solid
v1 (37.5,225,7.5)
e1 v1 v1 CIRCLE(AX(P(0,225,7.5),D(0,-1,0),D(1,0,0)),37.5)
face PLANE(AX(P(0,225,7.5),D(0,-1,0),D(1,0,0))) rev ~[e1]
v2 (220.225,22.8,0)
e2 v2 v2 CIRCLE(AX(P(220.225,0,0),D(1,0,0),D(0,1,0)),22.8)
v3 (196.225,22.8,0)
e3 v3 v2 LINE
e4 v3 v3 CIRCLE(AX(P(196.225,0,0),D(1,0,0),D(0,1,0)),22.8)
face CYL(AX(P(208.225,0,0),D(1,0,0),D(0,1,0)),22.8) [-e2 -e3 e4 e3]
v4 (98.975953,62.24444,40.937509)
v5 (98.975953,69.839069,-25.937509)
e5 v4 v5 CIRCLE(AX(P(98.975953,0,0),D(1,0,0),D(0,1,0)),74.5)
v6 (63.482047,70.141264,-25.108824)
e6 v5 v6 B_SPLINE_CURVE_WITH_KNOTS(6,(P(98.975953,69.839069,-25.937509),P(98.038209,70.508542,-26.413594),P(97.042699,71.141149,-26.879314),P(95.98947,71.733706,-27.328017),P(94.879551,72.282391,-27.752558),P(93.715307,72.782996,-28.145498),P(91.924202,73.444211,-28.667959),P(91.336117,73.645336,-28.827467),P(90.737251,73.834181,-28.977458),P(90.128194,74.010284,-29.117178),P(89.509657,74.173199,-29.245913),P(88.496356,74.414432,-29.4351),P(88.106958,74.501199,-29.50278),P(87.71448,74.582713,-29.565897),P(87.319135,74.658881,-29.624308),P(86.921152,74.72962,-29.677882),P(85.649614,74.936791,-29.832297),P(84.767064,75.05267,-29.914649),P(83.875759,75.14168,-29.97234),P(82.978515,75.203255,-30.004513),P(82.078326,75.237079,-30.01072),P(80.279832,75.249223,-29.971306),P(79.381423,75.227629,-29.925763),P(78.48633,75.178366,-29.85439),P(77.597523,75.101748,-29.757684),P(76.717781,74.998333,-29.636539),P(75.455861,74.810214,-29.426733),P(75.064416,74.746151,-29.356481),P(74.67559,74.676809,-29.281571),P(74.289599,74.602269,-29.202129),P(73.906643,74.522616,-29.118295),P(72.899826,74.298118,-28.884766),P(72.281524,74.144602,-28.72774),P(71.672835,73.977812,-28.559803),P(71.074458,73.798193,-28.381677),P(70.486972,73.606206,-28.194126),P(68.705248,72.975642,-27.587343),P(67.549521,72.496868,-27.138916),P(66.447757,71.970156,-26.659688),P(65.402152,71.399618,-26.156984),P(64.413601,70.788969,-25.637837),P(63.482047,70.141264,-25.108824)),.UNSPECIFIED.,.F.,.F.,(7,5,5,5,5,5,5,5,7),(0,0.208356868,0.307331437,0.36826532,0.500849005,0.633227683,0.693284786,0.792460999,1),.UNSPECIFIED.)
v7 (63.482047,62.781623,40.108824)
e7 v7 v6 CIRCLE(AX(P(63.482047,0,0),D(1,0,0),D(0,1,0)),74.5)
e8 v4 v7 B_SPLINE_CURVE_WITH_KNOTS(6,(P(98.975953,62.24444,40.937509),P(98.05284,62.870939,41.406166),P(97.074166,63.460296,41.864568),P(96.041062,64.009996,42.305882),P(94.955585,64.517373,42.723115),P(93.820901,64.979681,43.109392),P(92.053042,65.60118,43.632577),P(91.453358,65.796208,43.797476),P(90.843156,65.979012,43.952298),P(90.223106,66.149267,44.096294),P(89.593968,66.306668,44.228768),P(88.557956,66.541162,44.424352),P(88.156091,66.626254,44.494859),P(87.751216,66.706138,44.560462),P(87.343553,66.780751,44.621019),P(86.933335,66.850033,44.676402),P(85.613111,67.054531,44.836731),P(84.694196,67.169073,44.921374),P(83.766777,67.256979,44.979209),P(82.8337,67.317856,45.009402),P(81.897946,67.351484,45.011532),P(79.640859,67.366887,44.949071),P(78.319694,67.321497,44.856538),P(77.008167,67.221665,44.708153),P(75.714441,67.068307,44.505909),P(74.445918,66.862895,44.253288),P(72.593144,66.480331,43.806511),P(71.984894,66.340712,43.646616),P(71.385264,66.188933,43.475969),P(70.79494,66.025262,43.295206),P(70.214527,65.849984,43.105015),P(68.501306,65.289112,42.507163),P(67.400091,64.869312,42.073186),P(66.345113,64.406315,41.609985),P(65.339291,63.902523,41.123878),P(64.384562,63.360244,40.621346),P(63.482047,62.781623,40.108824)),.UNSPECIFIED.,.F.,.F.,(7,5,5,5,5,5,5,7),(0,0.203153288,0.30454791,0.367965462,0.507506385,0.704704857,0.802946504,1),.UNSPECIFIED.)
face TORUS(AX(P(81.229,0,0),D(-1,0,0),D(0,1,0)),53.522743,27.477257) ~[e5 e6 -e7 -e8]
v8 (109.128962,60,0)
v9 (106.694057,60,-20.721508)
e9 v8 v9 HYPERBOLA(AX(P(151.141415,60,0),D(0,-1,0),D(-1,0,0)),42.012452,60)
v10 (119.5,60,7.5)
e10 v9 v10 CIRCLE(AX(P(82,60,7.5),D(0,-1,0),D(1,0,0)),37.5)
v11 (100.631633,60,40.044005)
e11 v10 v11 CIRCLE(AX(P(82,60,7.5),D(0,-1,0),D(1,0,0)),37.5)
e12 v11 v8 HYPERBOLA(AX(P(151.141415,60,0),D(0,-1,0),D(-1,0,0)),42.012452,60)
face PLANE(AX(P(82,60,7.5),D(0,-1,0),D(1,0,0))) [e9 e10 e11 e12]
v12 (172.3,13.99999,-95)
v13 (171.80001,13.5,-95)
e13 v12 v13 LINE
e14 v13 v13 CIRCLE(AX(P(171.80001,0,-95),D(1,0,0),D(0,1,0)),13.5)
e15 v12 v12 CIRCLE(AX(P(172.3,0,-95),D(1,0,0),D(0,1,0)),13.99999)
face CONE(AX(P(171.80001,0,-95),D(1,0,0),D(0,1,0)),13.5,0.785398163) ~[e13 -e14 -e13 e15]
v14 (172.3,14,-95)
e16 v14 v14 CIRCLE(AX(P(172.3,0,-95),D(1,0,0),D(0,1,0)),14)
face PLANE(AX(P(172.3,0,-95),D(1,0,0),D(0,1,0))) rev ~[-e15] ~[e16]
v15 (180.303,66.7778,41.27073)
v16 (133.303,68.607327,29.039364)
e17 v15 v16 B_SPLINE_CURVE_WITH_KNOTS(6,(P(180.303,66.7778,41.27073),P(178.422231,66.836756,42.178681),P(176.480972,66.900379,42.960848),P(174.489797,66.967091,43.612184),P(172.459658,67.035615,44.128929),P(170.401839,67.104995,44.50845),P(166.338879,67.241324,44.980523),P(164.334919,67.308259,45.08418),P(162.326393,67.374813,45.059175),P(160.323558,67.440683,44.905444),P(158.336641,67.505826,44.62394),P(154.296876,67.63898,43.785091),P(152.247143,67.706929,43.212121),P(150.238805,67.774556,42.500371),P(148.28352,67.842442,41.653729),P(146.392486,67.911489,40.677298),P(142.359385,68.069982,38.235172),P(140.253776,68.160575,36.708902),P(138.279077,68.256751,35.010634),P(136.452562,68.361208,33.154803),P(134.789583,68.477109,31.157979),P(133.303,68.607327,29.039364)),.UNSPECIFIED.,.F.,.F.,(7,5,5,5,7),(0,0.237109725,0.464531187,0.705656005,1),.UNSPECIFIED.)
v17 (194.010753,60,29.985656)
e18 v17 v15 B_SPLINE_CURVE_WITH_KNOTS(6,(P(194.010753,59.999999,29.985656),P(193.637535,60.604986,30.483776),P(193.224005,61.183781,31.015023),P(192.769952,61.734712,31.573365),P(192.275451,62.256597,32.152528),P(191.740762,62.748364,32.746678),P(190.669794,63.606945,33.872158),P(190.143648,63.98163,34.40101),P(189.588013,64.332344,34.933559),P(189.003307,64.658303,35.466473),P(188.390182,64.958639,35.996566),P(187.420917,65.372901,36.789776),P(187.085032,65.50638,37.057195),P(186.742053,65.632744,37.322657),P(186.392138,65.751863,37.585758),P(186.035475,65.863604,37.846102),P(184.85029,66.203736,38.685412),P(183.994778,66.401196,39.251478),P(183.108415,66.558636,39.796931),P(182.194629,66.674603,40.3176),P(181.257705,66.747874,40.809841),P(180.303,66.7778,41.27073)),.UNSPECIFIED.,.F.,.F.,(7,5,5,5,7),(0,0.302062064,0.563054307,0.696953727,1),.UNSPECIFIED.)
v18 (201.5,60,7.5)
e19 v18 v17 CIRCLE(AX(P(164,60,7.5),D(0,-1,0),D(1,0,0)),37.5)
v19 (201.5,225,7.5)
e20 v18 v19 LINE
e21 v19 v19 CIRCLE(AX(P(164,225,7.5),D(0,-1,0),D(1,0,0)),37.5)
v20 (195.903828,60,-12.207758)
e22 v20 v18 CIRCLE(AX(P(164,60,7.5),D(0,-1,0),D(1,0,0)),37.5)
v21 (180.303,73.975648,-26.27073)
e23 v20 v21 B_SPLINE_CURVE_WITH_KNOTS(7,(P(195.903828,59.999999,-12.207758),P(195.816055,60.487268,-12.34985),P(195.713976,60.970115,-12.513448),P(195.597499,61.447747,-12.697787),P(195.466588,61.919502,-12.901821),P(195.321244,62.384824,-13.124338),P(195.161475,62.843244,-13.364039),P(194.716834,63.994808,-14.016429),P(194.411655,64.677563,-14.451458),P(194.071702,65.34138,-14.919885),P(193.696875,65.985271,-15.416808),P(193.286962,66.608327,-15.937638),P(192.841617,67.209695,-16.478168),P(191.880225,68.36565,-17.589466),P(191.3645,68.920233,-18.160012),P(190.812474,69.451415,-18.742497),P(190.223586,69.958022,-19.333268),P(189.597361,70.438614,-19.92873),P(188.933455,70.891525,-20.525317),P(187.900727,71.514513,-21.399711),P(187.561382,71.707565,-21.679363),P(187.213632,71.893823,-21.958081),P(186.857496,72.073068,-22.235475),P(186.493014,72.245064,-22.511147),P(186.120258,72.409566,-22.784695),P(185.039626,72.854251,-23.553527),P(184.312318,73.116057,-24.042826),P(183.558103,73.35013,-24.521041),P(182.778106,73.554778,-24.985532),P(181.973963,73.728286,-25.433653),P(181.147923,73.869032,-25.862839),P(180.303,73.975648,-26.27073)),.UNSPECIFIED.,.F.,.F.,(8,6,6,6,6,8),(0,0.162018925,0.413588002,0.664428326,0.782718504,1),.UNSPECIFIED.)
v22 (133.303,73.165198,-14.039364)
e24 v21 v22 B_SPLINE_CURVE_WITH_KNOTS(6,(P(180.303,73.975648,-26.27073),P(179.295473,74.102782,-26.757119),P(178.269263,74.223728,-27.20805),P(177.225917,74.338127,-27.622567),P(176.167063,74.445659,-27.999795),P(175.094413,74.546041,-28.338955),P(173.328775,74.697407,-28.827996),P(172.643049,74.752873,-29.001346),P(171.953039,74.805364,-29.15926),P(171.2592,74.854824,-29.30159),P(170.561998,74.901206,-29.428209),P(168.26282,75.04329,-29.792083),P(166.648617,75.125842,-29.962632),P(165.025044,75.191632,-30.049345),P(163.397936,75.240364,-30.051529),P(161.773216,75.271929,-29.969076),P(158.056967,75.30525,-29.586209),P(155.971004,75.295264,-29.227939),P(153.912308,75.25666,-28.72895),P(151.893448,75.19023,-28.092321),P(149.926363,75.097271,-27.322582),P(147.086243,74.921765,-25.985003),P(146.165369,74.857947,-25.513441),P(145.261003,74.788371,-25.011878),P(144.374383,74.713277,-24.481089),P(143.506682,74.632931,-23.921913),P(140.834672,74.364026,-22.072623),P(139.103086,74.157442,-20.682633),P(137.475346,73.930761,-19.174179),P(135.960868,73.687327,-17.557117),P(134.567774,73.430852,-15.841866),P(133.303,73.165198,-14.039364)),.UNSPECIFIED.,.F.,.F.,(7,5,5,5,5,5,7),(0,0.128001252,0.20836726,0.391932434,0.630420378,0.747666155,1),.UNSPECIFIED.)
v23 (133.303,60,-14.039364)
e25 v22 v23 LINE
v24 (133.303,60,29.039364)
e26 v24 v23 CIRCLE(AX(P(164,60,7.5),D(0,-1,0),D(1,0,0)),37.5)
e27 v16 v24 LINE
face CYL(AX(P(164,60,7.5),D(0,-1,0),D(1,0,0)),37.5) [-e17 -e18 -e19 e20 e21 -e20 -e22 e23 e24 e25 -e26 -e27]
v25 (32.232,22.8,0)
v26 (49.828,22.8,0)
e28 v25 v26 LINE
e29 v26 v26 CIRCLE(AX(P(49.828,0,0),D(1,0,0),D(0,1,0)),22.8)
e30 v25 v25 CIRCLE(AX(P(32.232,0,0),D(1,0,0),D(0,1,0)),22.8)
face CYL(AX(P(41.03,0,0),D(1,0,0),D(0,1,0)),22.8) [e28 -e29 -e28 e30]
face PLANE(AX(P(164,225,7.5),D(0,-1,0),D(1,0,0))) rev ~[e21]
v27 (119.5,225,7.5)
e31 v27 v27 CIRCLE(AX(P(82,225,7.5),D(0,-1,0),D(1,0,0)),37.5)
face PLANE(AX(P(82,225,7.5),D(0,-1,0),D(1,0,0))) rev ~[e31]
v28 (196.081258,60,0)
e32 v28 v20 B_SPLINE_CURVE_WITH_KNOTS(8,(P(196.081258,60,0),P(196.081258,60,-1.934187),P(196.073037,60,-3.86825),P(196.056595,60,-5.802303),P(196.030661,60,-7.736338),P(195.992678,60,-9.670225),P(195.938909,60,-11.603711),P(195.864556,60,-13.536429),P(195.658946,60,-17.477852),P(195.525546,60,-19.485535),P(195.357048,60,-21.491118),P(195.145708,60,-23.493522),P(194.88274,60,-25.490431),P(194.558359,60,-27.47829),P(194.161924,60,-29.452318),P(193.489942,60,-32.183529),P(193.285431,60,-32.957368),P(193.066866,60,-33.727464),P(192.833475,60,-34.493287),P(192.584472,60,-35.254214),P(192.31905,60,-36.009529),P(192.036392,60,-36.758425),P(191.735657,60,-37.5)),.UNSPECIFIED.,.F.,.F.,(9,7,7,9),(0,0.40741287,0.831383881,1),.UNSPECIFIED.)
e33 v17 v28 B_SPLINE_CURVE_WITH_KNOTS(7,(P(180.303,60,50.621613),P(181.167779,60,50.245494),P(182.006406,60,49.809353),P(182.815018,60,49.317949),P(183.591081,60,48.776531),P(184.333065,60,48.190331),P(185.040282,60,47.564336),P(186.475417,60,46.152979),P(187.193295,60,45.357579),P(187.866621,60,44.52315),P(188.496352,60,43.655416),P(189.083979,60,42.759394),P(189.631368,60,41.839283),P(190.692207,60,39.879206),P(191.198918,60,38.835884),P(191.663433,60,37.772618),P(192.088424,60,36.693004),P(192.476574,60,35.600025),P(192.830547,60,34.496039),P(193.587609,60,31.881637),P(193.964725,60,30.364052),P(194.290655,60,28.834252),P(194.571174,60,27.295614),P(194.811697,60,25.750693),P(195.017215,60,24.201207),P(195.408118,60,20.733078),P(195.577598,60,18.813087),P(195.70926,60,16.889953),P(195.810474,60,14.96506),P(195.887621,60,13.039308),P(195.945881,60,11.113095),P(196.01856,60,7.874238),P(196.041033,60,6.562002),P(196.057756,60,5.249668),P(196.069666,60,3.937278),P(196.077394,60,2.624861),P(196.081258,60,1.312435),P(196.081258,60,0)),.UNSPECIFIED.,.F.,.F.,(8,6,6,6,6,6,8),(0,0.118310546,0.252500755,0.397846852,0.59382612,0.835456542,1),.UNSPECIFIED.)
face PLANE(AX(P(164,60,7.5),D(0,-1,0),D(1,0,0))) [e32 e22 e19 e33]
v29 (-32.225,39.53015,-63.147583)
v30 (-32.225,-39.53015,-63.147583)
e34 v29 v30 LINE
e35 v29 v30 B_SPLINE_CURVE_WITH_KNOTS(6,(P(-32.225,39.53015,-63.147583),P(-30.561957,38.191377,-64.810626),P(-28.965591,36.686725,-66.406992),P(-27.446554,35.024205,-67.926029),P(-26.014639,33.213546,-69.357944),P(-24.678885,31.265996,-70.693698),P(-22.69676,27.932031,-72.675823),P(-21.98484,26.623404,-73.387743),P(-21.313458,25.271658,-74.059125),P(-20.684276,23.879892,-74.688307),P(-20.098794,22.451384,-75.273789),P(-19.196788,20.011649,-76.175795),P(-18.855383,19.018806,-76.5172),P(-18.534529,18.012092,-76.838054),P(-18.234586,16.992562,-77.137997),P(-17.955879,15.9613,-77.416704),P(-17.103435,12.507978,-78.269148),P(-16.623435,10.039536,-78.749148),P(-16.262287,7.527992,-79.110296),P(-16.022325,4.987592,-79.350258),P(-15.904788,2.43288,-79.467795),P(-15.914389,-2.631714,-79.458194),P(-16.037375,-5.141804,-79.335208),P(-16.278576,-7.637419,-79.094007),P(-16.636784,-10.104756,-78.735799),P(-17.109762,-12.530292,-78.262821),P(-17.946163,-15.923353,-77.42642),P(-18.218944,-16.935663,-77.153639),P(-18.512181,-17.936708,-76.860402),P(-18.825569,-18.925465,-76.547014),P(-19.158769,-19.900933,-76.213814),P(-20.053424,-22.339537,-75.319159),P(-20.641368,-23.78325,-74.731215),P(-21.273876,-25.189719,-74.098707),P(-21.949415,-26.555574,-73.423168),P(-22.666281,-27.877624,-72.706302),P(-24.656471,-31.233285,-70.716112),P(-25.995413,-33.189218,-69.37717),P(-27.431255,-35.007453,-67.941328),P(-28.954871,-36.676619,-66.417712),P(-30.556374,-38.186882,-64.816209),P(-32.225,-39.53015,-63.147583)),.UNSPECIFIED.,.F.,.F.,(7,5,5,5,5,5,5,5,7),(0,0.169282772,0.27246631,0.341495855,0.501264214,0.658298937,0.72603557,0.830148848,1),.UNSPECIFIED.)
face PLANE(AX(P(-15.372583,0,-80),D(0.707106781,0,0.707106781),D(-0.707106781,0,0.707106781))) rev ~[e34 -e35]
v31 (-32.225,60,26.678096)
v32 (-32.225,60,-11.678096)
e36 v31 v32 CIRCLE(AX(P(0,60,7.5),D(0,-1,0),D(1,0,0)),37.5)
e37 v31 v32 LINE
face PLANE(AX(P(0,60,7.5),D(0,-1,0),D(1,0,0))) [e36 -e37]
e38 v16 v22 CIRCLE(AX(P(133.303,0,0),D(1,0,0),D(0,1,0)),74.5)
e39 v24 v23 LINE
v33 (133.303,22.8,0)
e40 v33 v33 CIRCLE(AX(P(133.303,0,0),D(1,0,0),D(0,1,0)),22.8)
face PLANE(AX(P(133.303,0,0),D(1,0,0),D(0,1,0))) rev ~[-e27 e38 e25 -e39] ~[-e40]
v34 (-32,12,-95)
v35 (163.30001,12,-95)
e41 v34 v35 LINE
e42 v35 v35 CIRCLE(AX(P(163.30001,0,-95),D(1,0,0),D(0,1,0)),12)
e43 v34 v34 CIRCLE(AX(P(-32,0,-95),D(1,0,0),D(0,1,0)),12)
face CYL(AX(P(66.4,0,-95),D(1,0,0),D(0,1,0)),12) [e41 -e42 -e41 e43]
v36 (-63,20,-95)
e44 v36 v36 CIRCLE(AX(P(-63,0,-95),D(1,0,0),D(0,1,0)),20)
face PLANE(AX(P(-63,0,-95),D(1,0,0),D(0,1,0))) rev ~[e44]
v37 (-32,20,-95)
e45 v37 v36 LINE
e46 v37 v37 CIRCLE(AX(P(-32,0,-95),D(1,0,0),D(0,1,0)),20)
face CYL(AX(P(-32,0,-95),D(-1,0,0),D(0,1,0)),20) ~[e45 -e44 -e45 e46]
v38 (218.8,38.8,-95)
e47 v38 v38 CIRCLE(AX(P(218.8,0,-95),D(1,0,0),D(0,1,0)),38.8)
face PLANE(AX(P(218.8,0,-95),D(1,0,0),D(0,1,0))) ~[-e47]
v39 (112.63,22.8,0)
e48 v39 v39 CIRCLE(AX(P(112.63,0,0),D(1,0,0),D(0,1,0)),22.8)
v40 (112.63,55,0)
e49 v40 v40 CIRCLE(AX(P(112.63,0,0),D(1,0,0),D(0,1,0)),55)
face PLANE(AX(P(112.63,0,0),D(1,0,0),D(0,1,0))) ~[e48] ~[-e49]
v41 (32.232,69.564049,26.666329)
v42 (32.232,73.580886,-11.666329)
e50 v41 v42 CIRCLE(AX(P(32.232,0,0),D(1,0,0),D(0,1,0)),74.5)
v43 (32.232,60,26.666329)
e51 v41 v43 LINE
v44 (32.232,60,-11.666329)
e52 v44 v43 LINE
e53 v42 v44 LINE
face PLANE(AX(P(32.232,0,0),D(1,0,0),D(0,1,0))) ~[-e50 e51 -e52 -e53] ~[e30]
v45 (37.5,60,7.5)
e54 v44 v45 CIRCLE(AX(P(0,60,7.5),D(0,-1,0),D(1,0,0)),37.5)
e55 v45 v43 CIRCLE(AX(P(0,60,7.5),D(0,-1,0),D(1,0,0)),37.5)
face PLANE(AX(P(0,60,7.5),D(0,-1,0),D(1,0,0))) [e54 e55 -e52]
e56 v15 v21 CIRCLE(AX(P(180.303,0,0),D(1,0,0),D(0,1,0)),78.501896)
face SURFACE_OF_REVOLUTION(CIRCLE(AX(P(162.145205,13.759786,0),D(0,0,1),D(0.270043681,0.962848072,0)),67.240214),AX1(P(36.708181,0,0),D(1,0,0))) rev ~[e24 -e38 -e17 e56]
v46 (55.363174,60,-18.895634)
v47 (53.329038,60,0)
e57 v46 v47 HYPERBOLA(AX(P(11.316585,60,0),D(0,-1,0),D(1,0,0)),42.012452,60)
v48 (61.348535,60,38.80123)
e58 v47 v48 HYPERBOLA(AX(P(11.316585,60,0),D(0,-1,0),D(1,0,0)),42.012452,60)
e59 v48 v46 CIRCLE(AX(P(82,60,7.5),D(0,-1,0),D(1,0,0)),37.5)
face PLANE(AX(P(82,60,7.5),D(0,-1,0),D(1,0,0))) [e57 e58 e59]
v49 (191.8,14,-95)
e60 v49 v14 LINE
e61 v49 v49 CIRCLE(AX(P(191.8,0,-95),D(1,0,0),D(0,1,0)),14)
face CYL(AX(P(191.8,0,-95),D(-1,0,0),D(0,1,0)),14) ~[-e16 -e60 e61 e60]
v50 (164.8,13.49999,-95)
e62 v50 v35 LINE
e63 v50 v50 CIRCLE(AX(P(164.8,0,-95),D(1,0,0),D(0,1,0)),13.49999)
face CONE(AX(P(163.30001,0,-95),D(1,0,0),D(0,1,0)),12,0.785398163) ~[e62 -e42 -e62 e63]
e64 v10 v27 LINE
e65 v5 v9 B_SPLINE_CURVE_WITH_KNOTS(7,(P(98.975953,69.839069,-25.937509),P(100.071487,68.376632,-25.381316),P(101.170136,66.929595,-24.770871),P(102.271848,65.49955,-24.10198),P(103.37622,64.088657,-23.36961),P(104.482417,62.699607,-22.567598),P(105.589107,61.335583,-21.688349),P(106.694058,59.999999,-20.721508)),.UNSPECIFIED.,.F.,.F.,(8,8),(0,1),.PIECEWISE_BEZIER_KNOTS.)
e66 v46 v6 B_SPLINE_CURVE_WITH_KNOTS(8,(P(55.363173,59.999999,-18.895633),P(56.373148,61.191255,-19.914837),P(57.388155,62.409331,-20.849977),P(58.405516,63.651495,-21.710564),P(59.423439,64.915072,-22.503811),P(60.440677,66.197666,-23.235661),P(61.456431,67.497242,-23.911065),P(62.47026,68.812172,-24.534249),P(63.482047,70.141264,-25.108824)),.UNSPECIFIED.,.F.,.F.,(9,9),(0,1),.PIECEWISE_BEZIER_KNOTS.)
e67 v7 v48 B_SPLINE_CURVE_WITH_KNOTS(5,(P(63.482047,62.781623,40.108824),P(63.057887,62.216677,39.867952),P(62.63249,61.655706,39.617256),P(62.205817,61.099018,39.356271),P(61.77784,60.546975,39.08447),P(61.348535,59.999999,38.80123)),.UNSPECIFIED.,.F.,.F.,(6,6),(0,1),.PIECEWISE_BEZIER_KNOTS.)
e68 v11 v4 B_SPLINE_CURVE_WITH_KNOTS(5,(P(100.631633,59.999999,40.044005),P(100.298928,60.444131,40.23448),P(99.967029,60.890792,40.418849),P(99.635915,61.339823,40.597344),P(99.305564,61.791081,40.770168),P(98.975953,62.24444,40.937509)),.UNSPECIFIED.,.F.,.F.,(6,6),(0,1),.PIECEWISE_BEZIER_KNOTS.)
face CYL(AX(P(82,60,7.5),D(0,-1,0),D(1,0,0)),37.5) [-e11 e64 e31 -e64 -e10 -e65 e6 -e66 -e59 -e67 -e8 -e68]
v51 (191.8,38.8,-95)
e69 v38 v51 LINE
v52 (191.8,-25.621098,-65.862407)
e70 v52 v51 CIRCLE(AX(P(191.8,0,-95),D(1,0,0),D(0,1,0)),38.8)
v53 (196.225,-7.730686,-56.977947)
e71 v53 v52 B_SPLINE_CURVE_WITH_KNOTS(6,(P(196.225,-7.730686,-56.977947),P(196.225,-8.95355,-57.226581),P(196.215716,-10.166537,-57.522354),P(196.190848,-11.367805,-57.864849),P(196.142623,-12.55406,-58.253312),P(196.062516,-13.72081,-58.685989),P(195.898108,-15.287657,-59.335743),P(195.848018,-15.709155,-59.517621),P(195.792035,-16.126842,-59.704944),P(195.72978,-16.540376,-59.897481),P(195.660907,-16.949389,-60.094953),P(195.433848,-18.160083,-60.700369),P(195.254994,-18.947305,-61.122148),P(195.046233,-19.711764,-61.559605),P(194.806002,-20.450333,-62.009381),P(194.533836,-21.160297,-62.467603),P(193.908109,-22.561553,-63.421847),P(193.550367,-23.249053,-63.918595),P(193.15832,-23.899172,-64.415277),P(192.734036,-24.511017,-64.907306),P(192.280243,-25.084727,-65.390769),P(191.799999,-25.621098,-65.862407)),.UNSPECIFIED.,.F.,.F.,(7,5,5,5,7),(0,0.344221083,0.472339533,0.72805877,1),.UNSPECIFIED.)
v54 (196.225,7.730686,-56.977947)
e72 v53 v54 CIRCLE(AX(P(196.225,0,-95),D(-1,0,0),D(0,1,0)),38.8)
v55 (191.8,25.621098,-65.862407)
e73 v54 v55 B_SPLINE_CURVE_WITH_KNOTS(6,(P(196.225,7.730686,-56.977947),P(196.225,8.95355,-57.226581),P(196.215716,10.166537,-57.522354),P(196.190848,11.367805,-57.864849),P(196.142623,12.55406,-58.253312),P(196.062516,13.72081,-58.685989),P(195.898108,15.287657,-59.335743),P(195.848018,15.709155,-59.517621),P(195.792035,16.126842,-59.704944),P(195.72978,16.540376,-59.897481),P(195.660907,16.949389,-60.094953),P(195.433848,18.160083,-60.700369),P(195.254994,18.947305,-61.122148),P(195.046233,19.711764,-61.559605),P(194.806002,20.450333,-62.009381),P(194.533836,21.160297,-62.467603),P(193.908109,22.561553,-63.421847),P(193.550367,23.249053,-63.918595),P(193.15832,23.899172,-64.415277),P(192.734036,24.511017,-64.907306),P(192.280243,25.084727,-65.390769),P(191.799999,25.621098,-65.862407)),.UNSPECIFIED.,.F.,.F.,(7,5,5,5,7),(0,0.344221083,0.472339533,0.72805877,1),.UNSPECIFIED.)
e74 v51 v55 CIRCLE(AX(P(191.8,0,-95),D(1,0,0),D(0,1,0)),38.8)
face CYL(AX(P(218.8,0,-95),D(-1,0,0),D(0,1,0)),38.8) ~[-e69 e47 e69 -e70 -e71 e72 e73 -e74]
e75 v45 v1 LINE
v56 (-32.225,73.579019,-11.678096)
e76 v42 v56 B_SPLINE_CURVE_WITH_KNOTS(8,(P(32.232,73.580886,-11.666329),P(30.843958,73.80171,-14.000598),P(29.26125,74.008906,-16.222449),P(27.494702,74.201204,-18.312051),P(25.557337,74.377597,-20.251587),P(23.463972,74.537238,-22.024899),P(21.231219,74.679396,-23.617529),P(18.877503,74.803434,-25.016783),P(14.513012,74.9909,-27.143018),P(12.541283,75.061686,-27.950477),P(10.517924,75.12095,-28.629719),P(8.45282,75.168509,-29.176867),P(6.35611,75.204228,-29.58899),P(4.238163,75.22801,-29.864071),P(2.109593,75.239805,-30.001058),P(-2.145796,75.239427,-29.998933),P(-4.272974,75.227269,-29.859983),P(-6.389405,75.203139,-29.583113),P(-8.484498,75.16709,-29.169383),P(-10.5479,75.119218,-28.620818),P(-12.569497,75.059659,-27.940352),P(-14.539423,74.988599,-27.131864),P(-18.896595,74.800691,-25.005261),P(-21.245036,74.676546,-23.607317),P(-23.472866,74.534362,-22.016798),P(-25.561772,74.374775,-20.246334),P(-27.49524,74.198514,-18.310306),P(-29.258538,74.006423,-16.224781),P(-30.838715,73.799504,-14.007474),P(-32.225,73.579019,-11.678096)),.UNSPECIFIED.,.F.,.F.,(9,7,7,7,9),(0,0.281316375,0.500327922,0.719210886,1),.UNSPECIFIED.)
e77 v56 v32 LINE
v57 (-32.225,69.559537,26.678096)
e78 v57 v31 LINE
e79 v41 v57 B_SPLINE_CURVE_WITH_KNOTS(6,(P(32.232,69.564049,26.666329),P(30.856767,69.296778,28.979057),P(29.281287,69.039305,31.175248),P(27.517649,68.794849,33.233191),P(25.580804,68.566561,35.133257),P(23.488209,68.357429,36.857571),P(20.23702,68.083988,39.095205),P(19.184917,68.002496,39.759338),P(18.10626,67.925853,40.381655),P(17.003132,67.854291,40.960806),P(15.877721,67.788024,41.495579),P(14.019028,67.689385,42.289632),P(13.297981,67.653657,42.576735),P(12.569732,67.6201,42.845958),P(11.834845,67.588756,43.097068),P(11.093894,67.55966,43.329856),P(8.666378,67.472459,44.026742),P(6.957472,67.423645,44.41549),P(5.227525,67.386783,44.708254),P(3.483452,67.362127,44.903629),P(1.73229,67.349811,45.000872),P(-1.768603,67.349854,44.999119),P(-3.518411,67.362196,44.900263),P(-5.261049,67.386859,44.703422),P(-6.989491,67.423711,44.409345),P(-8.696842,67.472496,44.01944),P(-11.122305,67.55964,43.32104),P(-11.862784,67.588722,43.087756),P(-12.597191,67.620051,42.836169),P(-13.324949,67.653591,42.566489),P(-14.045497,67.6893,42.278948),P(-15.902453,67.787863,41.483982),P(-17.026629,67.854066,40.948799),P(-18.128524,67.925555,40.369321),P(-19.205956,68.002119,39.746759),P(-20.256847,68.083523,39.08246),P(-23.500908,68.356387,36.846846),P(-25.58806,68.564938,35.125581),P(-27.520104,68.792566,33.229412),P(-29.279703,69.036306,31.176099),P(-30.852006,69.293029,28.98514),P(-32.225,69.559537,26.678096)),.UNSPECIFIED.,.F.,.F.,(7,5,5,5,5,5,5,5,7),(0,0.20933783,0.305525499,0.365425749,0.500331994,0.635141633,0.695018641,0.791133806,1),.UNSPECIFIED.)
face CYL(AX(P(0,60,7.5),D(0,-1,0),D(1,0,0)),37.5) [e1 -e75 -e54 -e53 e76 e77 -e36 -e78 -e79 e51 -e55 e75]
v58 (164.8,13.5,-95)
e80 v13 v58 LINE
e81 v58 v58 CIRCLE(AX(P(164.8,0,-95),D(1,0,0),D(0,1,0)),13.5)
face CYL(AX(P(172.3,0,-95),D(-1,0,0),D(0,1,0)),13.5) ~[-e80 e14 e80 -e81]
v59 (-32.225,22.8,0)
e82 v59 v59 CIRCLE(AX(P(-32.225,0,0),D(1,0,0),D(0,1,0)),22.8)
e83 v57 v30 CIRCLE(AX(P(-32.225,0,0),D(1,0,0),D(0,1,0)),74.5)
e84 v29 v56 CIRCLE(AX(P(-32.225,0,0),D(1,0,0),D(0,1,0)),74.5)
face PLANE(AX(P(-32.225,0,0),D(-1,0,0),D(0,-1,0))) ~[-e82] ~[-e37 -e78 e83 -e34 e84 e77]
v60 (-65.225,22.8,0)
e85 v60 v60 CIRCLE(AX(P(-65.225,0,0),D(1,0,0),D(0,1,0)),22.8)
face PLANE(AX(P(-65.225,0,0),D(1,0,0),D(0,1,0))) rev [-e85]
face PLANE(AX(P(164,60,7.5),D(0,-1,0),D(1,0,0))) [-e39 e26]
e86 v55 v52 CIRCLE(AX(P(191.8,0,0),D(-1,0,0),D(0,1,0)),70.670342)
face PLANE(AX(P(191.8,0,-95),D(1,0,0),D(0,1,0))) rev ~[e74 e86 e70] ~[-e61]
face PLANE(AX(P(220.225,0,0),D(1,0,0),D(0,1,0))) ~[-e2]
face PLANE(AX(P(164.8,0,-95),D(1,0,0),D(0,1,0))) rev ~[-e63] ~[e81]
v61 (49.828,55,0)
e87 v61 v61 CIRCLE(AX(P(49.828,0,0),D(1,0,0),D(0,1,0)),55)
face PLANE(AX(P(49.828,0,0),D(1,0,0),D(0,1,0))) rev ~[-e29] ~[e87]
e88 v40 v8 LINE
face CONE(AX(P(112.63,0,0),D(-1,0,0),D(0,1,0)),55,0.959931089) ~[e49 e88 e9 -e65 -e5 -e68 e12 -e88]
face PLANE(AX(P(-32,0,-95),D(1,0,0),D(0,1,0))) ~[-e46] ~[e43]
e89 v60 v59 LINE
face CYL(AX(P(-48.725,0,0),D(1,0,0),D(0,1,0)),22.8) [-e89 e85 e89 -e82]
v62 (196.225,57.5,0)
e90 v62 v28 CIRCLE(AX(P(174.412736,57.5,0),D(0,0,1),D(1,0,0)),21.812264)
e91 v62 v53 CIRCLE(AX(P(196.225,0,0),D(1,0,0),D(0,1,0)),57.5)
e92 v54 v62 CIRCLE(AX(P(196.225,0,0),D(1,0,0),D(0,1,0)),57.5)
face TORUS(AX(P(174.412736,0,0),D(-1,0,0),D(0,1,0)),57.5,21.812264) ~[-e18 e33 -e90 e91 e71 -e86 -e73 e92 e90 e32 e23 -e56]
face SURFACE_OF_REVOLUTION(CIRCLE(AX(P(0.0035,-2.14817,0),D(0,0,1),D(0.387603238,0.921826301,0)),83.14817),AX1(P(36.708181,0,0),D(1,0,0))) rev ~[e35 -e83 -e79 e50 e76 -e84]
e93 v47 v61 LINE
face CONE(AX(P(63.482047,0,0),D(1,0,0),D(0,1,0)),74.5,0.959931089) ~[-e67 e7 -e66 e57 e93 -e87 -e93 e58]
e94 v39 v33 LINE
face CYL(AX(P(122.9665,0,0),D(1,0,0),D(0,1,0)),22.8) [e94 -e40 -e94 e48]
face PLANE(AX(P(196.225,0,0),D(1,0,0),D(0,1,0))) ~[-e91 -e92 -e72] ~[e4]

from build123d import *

# Parameters (mm, degrees)
F5_W      = 33
F5_H      = 22.8
F5_W_2    = 17.596
F5_W_3    = 20.673
F5_W_4    = 24
F4_R      = 37.5
F9_DEPTH  = 165
F12_DEPTH = 100
F13_W     = 196.8
F13_H     = 12
F15_SIZE  = 0.49999
F16_SIZE  = 1.49999


# Not quite as in the source:
# - a fillet or chamfer is up to 0.001 mm smaller than in the source, because OpenCascade refuses the exact size


with BuildPart() as f6:
    # F5 (on Top) → F6 (revolve)
    with BuildSketch(Plane.XY):
        with Locations((-48.725, 11.4)):
            Rectangle(F5_W, F5_H)
        with BuildLine():
            Line((-32.225, 22.8), (-32.225, 0))
            Line((-32.225, 0), (32.232, 0))
            Line((32.232, 0), (32.232, 22.8))
            Line((32.232, 22.8), (32.232, 74.5))
            ThreePointArc((32.232, 74.5), (0.0035, 81), (-32.225, 74.5))
            Line((-32.225, 74.5), (-32.225, 22.8))
        make_face()
        with Locations((41.03, 11.4)):
            Rectangle(F5_W_2, F5_H)
        with BuildLine():
            Line((49.828, 22.8), (49.828, 0))
            Line((49.828, 0), (112.63, 0))
            Line((112.63, 0), (112.63, 22.8))
            Line((112.63, 22.8), (112.63, 55))
            Line((112.63, 55), (98.9759530049, 74.5))
            ThreePointArc((98.9759530049, 74.5), (81.229, 81), (63.4820469951, 74.5))
            Line((63.4820469951, 74.5), (49.828, 55))
            Line((49.828, 55), (49.828, 22.8))
        make_face()
        with Locations((122.9665, 11.4)):
            Rectangle(F5_W_3, F5_H)
        with BuildLine():
            Line((133.303, 22.8), (133.303, 0))
            Line((133.303, 0), (196.225, 0))
            Line((196.225, 0), (196.225, 22.8))
            Line((196.225, 22.8), (196.225, 57.5))
            ThreePointArc((196.225, 57.5), (191.7945491151, 70.6775352134), (180.303, 78.5018964191))
            ThreePointArc((180.303, 78.5018964191), (156.4405623285, 80.7575727631), (133.303, 74.5))
            Line((133.303, 74.5), (133.303, 22.8))
        make_face()
        with Locations((208.225, 11.4)):
            Rectangle(F5_W_4, F5_H)
    revolve(axis=Axis((36.7081814394, 0, 0), (1, 0, 0)))

    # F4 (on offset) → F9 (join)
    with BuildSketch(Plane.XZ.offset(-60)):
        with Locations((164, 7.5)):
            Circle(F4_R)
        with Locations((82, 7.5)):
            Circle(F4_R)
        with Locations((0, 7.5)):
            Circle(F4_R)
    extrude(amount=-F9_DEPTH)

    # F11 (on Front) → F12 (cut, symmetric)
    with BuildSketch(Plane.XZ):
        Polygon((-15.372583002, -80), (-38, -57.372583002), (-38, -80), align=None)
    extrude(amount=F12_DEPTH, both=True, mode=Mode.SUBTRACT)

    # F13 (on offset) → F14 (revolve)
    with BuildSketch(Plane.XY.offset(-95)):
        Polygon((191.8, 14), (191.8, 0), (218.8, 0), (218.8, 38.8), (191.8, 38.8), align=None)
        Polygon((172.3, 13.5), (172.3, 0), (191.8, 0), (191.8, 14), (172.3, 14), align=None)
        Polygon((164.8, 12), (164.8, 0), (172.3, 0), (172.3, 13.5), (164.8, 13.5), align=None)
        with Locations((66.4, 6)):
            Rectangle(F13_W, F13_H)
        Polygon((-63, 20), (-63, 0), (-32, 0), (-32, 12), (-32, 20), align=None)
    revolve(axis=Axis((109.8132303458, 0, -95), (1, 0, 0)))

    # F15 (size 0.5 in the source; OpenCascade refuses exactly that, so slightly less here)
    f15_edges = [f6.edges().sort_by_distance(p)[0] for p in [
        (172.3, -13.5, -95),
    ]]
    chamfer(f15_edges, length=F15_SIZE)

    # F16 (size 1.5 in the source; OpenCascade refuses exactly that, so slightly less here)
    f16_edges = [f6.edges().sort_by_distance(p)[0] for p in [
        (164.8, -12, -95),
    ]]
    chamfer(f16_edges, length=F16_SIZE)


solid = f6.part
